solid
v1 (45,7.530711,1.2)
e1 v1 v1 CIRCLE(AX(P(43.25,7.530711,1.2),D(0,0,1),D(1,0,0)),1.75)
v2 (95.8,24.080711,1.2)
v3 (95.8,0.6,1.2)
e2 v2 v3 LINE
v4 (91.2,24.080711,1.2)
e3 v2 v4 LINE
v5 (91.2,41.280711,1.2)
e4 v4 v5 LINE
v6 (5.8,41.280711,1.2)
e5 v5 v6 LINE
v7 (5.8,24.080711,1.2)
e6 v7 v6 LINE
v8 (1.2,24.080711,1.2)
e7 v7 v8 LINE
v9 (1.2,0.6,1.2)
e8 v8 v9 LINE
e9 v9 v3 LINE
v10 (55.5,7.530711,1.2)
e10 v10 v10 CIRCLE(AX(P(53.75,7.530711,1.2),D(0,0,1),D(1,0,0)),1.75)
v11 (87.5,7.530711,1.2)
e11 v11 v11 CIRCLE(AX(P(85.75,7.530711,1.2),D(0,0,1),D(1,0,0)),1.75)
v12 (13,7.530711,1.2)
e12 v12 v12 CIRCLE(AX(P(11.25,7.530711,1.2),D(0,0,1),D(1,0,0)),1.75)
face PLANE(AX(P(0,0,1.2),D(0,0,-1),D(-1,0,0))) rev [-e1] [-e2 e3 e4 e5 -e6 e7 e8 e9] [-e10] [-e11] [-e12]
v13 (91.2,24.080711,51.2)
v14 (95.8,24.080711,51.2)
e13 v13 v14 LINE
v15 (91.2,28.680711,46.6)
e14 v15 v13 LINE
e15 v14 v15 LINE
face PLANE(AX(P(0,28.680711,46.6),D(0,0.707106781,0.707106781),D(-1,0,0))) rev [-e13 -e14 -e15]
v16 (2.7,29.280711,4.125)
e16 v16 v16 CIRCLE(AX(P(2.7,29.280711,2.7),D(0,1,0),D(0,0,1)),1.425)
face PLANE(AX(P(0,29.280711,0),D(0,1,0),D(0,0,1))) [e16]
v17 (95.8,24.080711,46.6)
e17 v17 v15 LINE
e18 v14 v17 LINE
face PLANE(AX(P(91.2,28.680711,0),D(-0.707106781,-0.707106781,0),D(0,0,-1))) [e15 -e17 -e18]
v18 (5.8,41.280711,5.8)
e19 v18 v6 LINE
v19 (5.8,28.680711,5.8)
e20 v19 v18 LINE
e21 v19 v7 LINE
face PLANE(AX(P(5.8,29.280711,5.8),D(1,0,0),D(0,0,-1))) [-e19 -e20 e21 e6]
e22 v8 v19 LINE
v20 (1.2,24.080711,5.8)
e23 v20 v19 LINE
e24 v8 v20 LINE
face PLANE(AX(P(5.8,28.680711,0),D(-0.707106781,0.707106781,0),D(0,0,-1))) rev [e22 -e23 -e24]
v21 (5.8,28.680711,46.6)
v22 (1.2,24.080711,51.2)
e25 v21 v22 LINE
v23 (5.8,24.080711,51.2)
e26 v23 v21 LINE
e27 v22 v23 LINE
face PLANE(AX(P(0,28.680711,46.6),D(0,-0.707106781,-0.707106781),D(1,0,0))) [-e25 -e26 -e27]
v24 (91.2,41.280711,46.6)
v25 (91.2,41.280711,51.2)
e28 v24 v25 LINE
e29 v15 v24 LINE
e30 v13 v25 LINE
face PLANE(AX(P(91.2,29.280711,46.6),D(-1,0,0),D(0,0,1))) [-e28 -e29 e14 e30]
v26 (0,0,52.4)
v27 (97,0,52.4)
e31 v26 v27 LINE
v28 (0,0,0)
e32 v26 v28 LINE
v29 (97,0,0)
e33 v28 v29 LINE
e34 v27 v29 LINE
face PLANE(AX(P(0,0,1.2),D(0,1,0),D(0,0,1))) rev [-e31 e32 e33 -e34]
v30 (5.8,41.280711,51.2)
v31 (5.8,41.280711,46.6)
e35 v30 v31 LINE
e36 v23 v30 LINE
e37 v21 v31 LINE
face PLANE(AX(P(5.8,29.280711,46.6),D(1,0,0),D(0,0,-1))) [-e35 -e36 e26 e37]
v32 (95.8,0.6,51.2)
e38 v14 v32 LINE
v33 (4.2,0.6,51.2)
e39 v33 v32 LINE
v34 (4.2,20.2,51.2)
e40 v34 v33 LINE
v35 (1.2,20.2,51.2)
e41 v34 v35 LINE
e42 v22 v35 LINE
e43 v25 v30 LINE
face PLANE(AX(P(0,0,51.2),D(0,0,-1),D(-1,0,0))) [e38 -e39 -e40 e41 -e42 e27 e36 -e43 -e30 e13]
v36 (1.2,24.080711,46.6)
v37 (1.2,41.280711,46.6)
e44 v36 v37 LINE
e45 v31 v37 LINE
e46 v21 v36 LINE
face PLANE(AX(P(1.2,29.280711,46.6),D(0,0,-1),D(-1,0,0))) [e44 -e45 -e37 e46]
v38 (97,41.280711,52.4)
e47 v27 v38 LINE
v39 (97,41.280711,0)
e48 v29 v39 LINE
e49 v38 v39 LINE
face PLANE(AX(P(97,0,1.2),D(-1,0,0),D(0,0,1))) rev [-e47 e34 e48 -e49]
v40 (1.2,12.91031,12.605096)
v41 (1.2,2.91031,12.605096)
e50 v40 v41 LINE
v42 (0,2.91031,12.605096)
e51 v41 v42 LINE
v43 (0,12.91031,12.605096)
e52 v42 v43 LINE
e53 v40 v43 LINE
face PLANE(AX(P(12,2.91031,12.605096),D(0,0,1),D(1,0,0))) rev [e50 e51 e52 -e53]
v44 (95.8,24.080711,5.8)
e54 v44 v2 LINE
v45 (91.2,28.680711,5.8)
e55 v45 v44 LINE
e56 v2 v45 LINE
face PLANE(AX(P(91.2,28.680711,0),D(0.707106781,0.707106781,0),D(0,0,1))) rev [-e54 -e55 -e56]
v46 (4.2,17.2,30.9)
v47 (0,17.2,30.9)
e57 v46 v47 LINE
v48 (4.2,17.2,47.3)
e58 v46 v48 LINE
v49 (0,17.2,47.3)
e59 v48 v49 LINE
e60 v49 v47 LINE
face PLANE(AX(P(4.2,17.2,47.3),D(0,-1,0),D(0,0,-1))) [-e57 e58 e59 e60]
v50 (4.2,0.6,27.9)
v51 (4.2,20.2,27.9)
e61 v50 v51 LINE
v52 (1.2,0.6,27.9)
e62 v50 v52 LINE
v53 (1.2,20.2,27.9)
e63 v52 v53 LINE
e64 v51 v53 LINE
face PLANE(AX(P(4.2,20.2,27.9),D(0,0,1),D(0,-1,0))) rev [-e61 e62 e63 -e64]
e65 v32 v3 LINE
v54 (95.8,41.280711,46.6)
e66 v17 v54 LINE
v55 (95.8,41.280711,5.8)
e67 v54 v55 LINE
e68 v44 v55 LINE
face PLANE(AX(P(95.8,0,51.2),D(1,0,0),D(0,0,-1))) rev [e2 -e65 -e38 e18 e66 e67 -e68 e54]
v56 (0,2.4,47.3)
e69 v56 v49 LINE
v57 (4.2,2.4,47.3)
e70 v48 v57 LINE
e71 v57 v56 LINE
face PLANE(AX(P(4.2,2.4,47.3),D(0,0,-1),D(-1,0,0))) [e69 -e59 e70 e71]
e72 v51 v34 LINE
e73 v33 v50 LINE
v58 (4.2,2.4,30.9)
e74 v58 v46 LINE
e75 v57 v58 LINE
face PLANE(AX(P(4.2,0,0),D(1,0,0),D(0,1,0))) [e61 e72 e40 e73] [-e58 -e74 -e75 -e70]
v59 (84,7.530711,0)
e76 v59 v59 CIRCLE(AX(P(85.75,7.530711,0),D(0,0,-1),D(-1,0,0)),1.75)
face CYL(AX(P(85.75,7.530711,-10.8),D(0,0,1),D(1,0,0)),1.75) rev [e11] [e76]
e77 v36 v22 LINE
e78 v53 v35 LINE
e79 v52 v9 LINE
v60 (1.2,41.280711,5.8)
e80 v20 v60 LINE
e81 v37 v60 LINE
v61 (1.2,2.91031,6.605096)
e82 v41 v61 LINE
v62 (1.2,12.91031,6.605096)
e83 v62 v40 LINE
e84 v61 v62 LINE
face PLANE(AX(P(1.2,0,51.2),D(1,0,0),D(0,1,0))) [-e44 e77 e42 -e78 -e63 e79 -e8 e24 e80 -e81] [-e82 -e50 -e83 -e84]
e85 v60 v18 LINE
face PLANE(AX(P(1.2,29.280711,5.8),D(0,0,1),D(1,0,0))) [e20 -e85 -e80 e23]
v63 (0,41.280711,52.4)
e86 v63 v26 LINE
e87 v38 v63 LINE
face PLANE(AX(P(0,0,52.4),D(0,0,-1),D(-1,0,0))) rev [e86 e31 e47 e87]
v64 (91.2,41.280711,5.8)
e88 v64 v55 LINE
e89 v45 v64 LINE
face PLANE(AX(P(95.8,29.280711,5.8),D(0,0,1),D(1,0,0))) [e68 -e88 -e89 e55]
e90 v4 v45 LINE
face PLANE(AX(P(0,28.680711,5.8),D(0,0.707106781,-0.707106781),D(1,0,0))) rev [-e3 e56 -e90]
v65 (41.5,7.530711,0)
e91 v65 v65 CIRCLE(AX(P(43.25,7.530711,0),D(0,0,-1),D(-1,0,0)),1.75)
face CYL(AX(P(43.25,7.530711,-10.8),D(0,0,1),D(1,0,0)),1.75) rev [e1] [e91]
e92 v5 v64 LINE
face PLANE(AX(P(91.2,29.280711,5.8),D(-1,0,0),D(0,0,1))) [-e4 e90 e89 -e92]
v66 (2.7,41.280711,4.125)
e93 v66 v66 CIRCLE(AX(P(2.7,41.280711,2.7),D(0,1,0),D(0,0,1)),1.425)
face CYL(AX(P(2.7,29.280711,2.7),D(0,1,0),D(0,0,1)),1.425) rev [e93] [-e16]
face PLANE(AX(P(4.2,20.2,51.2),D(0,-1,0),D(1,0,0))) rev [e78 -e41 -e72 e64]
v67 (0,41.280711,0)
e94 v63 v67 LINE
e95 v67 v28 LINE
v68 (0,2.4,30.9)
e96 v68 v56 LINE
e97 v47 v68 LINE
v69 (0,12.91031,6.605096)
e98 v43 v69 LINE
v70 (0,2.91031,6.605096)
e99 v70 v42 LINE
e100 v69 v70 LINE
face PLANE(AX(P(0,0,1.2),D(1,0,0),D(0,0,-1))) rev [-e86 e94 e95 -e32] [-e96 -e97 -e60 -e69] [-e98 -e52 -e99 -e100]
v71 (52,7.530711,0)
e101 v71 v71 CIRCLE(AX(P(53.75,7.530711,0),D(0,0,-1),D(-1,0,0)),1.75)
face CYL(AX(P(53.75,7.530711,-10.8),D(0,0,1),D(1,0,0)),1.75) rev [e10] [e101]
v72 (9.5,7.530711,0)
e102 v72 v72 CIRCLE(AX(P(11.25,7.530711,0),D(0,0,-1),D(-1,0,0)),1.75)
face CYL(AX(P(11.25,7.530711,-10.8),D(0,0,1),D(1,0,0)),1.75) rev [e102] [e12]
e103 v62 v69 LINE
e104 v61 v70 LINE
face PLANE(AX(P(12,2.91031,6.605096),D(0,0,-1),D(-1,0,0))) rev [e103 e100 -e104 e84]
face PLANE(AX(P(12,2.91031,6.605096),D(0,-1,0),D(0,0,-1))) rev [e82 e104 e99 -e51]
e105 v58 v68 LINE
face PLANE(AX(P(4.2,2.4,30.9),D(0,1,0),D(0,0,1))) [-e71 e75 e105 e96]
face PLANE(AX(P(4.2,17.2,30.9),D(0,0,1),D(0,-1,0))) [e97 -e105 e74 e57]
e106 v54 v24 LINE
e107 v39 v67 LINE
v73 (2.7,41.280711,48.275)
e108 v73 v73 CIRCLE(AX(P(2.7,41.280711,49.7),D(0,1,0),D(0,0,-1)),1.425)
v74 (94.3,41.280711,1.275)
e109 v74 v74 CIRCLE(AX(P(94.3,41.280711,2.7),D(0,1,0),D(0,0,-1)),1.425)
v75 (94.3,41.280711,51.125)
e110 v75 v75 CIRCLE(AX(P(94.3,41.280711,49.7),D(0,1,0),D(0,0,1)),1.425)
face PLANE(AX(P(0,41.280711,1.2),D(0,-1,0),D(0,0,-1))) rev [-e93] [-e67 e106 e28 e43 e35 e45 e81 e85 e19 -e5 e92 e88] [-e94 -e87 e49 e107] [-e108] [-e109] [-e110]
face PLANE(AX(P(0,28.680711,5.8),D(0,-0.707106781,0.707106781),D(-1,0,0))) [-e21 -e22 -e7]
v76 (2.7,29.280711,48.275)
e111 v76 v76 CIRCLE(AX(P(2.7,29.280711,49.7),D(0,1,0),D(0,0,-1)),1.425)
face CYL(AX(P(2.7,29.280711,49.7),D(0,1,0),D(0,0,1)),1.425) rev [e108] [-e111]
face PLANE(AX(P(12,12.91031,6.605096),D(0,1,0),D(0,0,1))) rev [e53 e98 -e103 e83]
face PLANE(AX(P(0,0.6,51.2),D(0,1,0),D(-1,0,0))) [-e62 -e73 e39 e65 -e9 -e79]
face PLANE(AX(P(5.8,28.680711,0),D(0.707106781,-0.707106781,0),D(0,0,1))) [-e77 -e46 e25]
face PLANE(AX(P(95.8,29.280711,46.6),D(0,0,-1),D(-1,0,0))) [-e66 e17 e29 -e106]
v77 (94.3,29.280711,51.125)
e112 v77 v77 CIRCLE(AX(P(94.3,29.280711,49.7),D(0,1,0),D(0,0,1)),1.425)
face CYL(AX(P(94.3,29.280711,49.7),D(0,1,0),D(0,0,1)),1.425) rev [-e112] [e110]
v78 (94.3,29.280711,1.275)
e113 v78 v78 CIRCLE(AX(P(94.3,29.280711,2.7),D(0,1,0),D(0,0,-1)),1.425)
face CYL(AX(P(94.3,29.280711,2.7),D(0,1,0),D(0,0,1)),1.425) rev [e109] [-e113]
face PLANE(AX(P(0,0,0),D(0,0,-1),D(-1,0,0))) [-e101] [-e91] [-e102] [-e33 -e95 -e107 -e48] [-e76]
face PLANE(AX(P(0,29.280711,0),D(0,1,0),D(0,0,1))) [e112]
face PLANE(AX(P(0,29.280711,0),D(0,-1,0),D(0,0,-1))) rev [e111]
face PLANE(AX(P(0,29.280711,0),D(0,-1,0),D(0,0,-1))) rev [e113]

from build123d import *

# Parameters (mm, degrees)
SKIZZE1_W                       = 97
SKIZZE1_H                       = 41.280710538
AUFSATZ_LINEAR_AUSTRAGEN1_DEPTH = 1.2
AUFSATZ_LINEAR_AUSTRAGEN2_DEPTH = 50
SKIZZE3_W                       = 23.3
SKIZZE3_H                       = 19.6
SKIZZE3_W_2                     = 16.4
SKIZZE3_H_2                     = 14.8
AUFSATZ_LINEAR_AUSTRAGEN3_DEPTH = 3
SKIZZE3_2_W                     = 16.4
SKIZZE3_2_H                     = 14.8
SCHNITT_LINEAR_AUSTRAGEN1_DEPTH = 117.203171482
SKIZZE5_W                       = 97
SKIZZE5_H                       = 41.280710538
AUFSATZ_LINEAR_AUSTRAGEN4_DEPTH = 1.2
SKIZZE7_W                       = 4.6
SKIZZE7_H                       = 4.6
SKIZZE7_R                       = 1.425
AUFSATZ_LINEAR_AUSTRAGEN5_DEPTH = 12
SKIZZE8_R                       = 1.75
SCHNITT_LINEAR_AUSTRAGEN3_DEPTH = 12
SKIZZE9_W                       = 6
SKIZZE9_H                       = 10
SCHNITT_LINEAR_AUSTRAGEN4_DEPTH = 12
SKIZZE10_W                      = 4.6
SKIZZE10_H                      = 4.6
AUFSATZ_LINEAR_AUSTRAGEN6_DEPTH = 0.6
FASE1_SIZE                      = 4.6


with BuildPart() as part:
    # Skizze1 → Aufsatz-Linear austragen1 (new body)
    with BuildSketch(Plane.XY):
        with Locations((48.5, 20.640355269)):
            Rectangle(SKIZZE1_W, SKIZZE1_H)
    extrude(amount=AUFSATZ_LINEAR_AUSTRAGEN1_DEPTH)

    # Skizze2 → Aufsatz-Linear austragen2 (add)
    with BuildSketch(Plane.XY.offset(1.2)):
        Polygon((0, 41.280710538), (0, 0), (48.5, 0), (97, 0), (97, 41.280710538), (95.8, 41.280710538), (95.8, 0.6), (1.2, 0.6), (1.2, 41.280710538), align=None)
    extrude(amount=AUFSATZ_LINEAR_AUSTRAGEN2_DEPTH)

    # Skizze3 → Aufsatz-Linear austragen3 (add)
    with BuildSketch(Plane(origin=(1.2, 0, 0), x_dir=(0, 0, -1), z_dir=(1, 0, 0))):
        with Locations((-39.55, 10.4)):
            Rectangle(SKIZZE3_W, SKIZZE3_H)
        with Locations((-39.1, 9.8)):
            Rectangle(SKIZZE3_W_2, SKIZZE3_H_2, mode=Mode.SUBTRACT)
    extrude(amount=AUFSATZ_LINEAR_AUSTRAGEN3_DEPTH)

    # Skizze3<2> → Schnitt-Linear austragen1 (cut, through all)
    with BuildSketch(Plane(origin=(1.2, 0, 0), x_dir=(0, 0, -1), z_dir=(1, 0, 0))):
        with Locations((-39.1, 9.8)):
            Rectangle(SKIZZE3_2_W, SKIZZE3_2_H)
    extrude(amount=-SCHNITT_LINEAR_AUSTRAGEN1_DEPTH, mode=Mode.SUBTRACT)

    # Skizze5 → Aufsatz-Linear austragen4 (add)
    with BuildSketch(Plane.XY.offset(51.2)):
        with Locations((48.5, 20.640355269)):
            Rectangle(SKIZZE5_W, SKIZZE5_H)
    extrude(amount=AUFSATZ_LINEAR_AUSTRAGEN4_DEPTH)

    # Skizze7 → Aufsatz-Linear austragen5 (add)
    # profile 1 of 4: a face of its own
    with BuildSketch(Plane(origin=(0, 41.280710538, 0), x_dir=(1, 0, 0), z_dir=(0, 1, 0))):
        with Locations((3.5, -3.5)):
            Rectangle(SKIZZE7_W, SKIZZE7_H)
        with Locations(Location((2.7, -2.7, 0), (0, 0, 270))):
            Circle(SKIZZE7_R, mode=Mode.SUBTRACT)
    # profile 2 of 4: a face of its own
    with BuildSketch(Plane(origin=(0, 41.280710538, 0), x_dir=(1, 0, 0), z_dir=(0, 1, 0))):
        with Locations((93.5, -3.5)):
            Rectangle(SKIZZE7_W, SKIZZE7_H)
        with Locations(Location((94.3, -2.7, 0), (0, 0, 90))):
            Circle(SKIZZE7_R, mode=Mode.SUBTRACT)
    # profile 3 of 4: a face of its own
    with BuildSketch(Plane(origin=(0, 41.280710538, 0), x_dir=(1, 0, 0), z_dir=(0, 1, 0))):
        with Locations((93.5, -48.9)):
            Rectangle(SKIZZE7_W, SKIZZE7_H)
        with Locations(Location((94.3, -49.7, 0), (0, 0, 270))):
            Circle(SKIZZE7_R, mode=Mode.SUBTRACT)
    # profile 4 of 4: a face of its own
    with BuildSketch(Plane(origin=(0, 41.280710538, 0), x_dir=(1, 0, 0), z_dir=(0, 1, 0))):
        with Locations((3.5, -48.9)):
            Rectangle(SKIZZE7_W, SKIZZE7_H)
        with Locations(Location((2.7, -49.7, 0), (0, 0, 90))):
            Circle(SKIZZE7_R, mode=Mode.SUBTRACT)
    extrude(amount=-AUFSATZ_LINEAR_AUSTRAGEN5_DEPTH)

    # Skizze8 → Schnitt-Linear austragen3 (cut)
    with BuildSketch(Plane.XY.offset(1.2)):
        with Locations((11.25, 7.530710538)):
            Circle(SKIZZE8_R)
        with Locations((43.25, 7.530710538)):
            Circle(SKIZZE8_R)
        with Locations((53.75, 7.530710538)):
            Circle(SKIZZE8_R)
        with Locations((85.75, 7.530710538)):
            Circle(SKIZZE8_R)
    extrude(amount=-SCHNITT_LINEAR_AUSTRAGEN3_DEPTH, mode=Mode.SUBTRACT)

    # Skizze9 → Schnitt-Linear austragen4 (cut)
    with BuildSketch(Plane.ZY):
        with Locations((9.605096132, 7.910310386)):
            Rectangle(SKIZZE9_W, SKIZZE9_H)
    extrude(amount=-SCHNITT_LINEAR_AUSTRAGEN4_DEPTH, mode=Mode.SUBTRACT)

    # Skizze10 → Aufsatz-Linear austragen6 (add)
    with BuildSketch(Plane.XZ.offset(-29.280710538)):
        with Locations((3.5, 48.9)):
            Rectangle(SKIZZE10_W, SKIZZE10_H)
        with Locations((3.5, 3.5)):
            Rectangle(SKIZZE10_W, SKIZZE10_H)
        with Locations((93.5, 48.9)):
            Rectangle(SKIZZE10_W, SKIZZE10_H)
        with Locations((93.5, 3.5)):
            Rectangle(SKIZZE10_W, SKIZZE10_H)
    extrude(amount=AUFSATZ_LINEAR_AUSTRAGEN6_DEPTH)

    # Fase1
    fase1_edges = [part.edges().sort_by_distance(p)[0] for p in [
        (1.2, 28.680710538, 3.5),
        (3.5, 28.680710538, 1.2),
        (93.5, 28.680710538, 1.2),
        (95.8, 28.680710538, 3.5),
        (95.8, 28.680710538, 48.9),
        (93.5, 28.680710538, 51.2),
        (1.2, 28.680710538, 48.9),
        (3.5, 28.680710538, 51.2),
    ]]
    chamfer(fase1_edges, length=FASE1_SIZE - 0.0001)  # a hair under: the kernel refuses the full size


solid = part.part
